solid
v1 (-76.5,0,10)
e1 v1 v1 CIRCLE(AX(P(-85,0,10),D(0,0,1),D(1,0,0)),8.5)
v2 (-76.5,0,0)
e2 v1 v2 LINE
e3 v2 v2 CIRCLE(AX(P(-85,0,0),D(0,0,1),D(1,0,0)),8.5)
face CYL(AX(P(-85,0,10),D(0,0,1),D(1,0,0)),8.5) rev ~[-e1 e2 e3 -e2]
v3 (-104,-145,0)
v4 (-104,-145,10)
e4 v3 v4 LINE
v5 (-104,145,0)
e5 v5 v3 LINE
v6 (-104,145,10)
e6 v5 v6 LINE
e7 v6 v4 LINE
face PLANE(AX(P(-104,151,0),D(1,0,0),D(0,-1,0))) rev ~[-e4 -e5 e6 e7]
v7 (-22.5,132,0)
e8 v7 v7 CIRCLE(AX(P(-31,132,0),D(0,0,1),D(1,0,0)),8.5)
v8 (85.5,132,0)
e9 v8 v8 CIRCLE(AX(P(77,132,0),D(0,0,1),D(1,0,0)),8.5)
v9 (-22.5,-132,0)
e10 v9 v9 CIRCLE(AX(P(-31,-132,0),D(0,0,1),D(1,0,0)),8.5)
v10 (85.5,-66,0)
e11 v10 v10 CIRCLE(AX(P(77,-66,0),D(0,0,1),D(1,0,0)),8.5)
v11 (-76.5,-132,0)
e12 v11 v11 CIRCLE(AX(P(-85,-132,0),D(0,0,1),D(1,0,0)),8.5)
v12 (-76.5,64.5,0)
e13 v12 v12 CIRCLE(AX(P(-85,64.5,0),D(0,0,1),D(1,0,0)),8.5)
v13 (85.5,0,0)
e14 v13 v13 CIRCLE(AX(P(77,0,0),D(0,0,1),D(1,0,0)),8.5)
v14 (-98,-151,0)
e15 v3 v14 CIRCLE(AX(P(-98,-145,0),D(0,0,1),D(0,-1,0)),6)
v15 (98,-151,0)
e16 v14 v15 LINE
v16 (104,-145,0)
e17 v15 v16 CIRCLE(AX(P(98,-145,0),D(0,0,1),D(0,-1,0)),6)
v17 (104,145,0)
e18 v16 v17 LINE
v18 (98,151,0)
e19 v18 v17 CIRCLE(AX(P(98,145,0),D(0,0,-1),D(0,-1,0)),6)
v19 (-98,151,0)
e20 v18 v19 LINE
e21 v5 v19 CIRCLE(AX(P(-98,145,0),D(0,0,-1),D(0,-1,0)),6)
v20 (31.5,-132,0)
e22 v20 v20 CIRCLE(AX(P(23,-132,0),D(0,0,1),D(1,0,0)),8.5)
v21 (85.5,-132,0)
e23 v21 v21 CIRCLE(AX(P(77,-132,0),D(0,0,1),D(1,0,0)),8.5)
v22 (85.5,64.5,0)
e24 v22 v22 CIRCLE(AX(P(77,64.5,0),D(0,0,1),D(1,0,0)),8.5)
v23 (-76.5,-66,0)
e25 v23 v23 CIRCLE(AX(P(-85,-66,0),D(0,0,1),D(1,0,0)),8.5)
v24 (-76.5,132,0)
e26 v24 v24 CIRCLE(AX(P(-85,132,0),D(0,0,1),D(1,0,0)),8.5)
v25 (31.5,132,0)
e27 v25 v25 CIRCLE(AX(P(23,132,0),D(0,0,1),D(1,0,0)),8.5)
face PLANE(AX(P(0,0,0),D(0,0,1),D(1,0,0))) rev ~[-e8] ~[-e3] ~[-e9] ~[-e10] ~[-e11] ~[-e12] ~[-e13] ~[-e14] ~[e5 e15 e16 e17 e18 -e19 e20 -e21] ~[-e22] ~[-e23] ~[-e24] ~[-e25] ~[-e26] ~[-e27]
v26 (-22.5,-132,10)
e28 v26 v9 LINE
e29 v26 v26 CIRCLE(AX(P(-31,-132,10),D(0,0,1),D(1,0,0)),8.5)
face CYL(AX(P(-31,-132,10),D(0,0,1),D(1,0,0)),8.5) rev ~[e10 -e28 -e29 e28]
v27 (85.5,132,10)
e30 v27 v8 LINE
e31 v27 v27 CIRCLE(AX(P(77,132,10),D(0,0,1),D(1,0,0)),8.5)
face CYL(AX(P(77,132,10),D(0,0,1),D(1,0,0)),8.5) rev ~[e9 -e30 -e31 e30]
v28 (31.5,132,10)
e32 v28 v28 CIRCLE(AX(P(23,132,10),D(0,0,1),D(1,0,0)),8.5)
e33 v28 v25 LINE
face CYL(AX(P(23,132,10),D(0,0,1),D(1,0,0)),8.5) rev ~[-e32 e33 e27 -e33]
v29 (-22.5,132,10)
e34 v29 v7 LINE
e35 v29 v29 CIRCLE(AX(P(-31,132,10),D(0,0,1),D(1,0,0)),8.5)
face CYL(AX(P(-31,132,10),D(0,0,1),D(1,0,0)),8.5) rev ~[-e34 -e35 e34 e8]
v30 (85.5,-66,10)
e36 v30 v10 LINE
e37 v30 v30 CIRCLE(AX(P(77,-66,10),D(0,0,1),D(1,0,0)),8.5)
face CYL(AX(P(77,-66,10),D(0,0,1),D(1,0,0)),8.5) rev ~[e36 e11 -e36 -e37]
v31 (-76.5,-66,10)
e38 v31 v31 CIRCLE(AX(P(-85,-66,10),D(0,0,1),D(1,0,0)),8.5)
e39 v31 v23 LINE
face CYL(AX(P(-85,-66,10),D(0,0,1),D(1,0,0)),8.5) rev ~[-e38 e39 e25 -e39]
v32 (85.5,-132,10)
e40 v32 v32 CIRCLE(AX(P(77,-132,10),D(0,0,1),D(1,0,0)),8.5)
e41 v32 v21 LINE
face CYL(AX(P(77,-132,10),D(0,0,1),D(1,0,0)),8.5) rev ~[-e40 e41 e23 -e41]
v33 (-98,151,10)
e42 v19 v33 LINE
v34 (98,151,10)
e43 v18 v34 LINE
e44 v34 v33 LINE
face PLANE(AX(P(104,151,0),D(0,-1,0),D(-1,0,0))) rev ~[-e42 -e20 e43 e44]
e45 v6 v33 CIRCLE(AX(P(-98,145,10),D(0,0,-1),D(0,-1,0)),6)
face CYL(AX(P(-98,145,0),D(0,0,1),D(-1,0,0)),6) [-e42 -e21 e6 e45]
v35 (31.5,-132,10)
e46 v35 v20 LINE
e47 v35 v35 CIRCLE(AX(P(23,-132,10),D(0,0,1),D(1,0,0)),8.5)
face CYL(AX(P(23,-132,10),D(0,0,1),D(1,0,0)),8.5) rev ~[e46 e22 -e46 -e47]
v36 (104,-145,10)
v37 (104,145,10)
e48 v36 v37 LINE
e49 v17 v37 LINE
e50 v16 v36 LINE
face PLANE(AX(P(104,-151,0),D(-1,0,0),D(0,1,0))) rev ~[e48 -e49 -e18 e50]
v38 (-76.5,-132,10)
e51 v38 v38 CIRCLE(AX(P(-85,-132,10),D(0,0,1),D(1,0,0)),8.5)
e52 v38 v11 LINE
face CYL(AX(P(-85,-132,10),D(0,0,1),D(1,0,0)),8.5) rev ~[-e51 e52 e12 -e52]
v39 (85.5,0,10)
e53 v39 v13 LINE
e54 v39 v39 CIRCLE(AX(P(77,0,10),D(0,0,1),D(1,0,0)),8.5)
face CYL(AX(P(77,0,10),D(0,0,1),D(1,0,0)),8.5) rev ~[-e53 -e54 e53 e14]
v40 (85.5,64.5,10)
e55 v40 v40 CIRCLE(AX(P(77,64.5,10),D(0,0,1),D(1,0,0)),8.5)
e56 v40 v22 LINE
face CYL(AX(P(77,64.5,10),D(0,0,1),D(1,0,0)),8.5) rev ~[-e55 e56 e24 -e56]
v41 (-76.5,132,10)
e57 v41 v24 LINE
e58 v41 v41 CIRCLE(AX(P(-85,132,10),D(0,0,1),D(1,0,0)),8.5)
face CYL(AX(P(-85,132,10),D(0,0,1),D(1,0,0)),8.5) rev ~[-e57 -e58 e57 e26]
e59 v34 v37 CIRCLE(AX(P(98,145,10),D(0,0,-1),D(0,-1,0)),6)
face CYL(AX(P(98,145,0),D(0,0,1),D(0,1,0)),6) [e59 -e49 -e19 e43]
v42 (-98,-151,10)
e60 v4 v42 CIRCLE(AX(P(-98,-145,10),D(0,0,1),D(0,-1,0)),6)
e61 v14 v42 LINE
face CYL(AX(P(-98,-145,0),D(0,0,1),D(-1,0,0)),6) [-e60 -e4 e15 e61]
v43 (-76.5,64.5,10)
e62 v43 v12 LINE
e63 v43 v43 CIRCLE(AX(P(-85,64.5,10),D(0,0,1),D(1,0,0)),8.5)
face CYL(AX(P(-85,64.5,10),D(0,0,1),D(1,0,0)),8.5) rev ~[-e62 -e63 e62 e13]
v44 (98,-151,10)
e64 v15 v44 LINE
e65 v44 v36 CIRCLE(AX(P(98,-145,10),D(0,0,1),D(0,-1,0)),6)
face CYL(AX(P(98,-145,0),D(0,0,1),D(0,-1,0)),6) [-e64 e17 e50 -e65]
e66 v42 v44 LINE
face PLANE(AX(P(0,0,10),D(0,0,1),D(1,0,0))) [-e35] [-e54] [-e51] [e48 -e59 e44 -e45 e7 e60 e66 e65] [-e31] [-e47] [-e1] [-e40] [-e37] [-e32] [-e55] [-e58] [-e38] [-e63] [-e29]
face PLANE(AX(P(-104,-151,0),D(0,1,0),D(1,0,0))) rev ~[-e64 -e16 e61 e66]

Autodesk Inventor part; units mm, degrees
ref_plane "YZ Plane" through (0, 0, 0) normal (1, 0, 0) x (0, 1, 0)
ref_plane "XZ Plane" through (0, 0, 0) normal (0, 1, 0) x (-1, 0, 0)
ref_plane "XY Plane" through (0, 0, 0) normal (0, 0, 1) x (1, 0, 0)
sketch "Sketch2" plane through (0, 0, 0) normal (0, 0, 1) x (1, 0, 0)
  line L0 (-54, -101) -> (54, -101)
  line L1 (54, -101) -> (54, 101)
  line L2 (54, 101) -> (-54, 101)
  line L3 (-54, 101) -> (-54, -101)
  line L4 (-54, -101) -> (54, 101) construction
  line L5 (54, -101) -> (-54, 101) construction
  line L6 (-104, -151) -> (104, -151)
  line L7 (104, -151) -> (104, 151)
  line L8 (104, 151) -> (-104, 151)
  line L9 (-104, 151) -> (-104, -151)
  point P0 (0, 0)
  dimension "d29" = 108
  dimension "d30" = 202
  dimension "d31" = 50
extrude "Plate2" add sketch "Sketch2" along normal blind 10 contours L3 L2 L1 L0 | L9 L8 L7 L6
sketch "Sketch5" plane through (0, 0, 10) normal (0, 0, 1) x (1, 0, 0)
  line L0 (104, -151) -> (-104, -151) construction
  line L1 (104, 151) -> (104, -151) construction
  line L2 (-104, 151) -> (104, 151) construction
  line L3 (-104, -151) -> (-104, 151) construction
  line L4 (-85, 132) -> (85, 132) construction
  line L5 (85, 132) -> (85, -132) construction
  line L6 (85, -132) -> (-85, -132) construction
  line L7 (-85, -132) -> (-85, 132) construction
  circle A0 centre (-85, -132) radius 8.5
  circle A1 centre (-85, 132) radius 8.5
  circle A2 centre (-85, 0) radius 8.5
  circle A3 centre (-85, -66) radius 8.5
  circle A4 centre (-85, 64.5) radius 8.5
  line L8 (-50, -0.75) -> (50, -0.75) construction
  circle A5 centre (-31, -132) radius 8.5
  circle A6 centre (-31, -66) radius 8.5
  circle A7 centre (-31, 0) radius 8.5
  circle A8 centre (-31, 64.5) radius 8.5
  circle A9 centre (-31, 132) radius 8.5
  circle A10 centre (23, -132) radius 8.5
  circle A11 centre (23, -66) radius 8.5
  circle A12 centre (23, 0) radius 8.5
  circle A13 centre (23, 64.5) radius 8.5
  circle A14 centre (23, 132) radius 8.5
  circle A15 centre (77, -132) radius 8.5
  circle A16 centre (77, -66) radius 8.5
  circle A17 centre (77, 0) radius 8.5
  circle A18 centre (77, 64.5) radius 8.5
  circle A19 centre (77, 132) radius 8.5
  point P0 (0, 0)
  point P1 (0, -132)
  dimension "d33" = 17
  dimension "d34" = 19
  dimension "d35" = 66
  dimension "d36" = 66
  dimension "d39" = 54
extrude "Cut3" cut sketch "Sketch5" against normal blind 10 contours A0 | A1 | A2 | A3 | A4 | A5 | A9 | A10 | A14 | A15 | A16 | A17 | A18 | A19
fillet "Corner Round1" radius 6 4 edges at (-104, -151, 5) (-104, 151, 5) (104, 151, 5) (104, -151, 5)
equation "\"d35\" = d36"
equation "\"d44\" = Thickness"
equation "\"d14\" = Thickness"
equation "\"BendReliefDepth\" = 0.5 * Thickness"
equation "\"TransitionRadius\" = BendRadius"
equation "\"JacobiRadiusSize\" = BendRadius"
equation "\"Thickness\" = 10"
equation "\"BendRadius\" = 6"
properties part number "PRS 1200-07 charging flange rect" material "Steel"
